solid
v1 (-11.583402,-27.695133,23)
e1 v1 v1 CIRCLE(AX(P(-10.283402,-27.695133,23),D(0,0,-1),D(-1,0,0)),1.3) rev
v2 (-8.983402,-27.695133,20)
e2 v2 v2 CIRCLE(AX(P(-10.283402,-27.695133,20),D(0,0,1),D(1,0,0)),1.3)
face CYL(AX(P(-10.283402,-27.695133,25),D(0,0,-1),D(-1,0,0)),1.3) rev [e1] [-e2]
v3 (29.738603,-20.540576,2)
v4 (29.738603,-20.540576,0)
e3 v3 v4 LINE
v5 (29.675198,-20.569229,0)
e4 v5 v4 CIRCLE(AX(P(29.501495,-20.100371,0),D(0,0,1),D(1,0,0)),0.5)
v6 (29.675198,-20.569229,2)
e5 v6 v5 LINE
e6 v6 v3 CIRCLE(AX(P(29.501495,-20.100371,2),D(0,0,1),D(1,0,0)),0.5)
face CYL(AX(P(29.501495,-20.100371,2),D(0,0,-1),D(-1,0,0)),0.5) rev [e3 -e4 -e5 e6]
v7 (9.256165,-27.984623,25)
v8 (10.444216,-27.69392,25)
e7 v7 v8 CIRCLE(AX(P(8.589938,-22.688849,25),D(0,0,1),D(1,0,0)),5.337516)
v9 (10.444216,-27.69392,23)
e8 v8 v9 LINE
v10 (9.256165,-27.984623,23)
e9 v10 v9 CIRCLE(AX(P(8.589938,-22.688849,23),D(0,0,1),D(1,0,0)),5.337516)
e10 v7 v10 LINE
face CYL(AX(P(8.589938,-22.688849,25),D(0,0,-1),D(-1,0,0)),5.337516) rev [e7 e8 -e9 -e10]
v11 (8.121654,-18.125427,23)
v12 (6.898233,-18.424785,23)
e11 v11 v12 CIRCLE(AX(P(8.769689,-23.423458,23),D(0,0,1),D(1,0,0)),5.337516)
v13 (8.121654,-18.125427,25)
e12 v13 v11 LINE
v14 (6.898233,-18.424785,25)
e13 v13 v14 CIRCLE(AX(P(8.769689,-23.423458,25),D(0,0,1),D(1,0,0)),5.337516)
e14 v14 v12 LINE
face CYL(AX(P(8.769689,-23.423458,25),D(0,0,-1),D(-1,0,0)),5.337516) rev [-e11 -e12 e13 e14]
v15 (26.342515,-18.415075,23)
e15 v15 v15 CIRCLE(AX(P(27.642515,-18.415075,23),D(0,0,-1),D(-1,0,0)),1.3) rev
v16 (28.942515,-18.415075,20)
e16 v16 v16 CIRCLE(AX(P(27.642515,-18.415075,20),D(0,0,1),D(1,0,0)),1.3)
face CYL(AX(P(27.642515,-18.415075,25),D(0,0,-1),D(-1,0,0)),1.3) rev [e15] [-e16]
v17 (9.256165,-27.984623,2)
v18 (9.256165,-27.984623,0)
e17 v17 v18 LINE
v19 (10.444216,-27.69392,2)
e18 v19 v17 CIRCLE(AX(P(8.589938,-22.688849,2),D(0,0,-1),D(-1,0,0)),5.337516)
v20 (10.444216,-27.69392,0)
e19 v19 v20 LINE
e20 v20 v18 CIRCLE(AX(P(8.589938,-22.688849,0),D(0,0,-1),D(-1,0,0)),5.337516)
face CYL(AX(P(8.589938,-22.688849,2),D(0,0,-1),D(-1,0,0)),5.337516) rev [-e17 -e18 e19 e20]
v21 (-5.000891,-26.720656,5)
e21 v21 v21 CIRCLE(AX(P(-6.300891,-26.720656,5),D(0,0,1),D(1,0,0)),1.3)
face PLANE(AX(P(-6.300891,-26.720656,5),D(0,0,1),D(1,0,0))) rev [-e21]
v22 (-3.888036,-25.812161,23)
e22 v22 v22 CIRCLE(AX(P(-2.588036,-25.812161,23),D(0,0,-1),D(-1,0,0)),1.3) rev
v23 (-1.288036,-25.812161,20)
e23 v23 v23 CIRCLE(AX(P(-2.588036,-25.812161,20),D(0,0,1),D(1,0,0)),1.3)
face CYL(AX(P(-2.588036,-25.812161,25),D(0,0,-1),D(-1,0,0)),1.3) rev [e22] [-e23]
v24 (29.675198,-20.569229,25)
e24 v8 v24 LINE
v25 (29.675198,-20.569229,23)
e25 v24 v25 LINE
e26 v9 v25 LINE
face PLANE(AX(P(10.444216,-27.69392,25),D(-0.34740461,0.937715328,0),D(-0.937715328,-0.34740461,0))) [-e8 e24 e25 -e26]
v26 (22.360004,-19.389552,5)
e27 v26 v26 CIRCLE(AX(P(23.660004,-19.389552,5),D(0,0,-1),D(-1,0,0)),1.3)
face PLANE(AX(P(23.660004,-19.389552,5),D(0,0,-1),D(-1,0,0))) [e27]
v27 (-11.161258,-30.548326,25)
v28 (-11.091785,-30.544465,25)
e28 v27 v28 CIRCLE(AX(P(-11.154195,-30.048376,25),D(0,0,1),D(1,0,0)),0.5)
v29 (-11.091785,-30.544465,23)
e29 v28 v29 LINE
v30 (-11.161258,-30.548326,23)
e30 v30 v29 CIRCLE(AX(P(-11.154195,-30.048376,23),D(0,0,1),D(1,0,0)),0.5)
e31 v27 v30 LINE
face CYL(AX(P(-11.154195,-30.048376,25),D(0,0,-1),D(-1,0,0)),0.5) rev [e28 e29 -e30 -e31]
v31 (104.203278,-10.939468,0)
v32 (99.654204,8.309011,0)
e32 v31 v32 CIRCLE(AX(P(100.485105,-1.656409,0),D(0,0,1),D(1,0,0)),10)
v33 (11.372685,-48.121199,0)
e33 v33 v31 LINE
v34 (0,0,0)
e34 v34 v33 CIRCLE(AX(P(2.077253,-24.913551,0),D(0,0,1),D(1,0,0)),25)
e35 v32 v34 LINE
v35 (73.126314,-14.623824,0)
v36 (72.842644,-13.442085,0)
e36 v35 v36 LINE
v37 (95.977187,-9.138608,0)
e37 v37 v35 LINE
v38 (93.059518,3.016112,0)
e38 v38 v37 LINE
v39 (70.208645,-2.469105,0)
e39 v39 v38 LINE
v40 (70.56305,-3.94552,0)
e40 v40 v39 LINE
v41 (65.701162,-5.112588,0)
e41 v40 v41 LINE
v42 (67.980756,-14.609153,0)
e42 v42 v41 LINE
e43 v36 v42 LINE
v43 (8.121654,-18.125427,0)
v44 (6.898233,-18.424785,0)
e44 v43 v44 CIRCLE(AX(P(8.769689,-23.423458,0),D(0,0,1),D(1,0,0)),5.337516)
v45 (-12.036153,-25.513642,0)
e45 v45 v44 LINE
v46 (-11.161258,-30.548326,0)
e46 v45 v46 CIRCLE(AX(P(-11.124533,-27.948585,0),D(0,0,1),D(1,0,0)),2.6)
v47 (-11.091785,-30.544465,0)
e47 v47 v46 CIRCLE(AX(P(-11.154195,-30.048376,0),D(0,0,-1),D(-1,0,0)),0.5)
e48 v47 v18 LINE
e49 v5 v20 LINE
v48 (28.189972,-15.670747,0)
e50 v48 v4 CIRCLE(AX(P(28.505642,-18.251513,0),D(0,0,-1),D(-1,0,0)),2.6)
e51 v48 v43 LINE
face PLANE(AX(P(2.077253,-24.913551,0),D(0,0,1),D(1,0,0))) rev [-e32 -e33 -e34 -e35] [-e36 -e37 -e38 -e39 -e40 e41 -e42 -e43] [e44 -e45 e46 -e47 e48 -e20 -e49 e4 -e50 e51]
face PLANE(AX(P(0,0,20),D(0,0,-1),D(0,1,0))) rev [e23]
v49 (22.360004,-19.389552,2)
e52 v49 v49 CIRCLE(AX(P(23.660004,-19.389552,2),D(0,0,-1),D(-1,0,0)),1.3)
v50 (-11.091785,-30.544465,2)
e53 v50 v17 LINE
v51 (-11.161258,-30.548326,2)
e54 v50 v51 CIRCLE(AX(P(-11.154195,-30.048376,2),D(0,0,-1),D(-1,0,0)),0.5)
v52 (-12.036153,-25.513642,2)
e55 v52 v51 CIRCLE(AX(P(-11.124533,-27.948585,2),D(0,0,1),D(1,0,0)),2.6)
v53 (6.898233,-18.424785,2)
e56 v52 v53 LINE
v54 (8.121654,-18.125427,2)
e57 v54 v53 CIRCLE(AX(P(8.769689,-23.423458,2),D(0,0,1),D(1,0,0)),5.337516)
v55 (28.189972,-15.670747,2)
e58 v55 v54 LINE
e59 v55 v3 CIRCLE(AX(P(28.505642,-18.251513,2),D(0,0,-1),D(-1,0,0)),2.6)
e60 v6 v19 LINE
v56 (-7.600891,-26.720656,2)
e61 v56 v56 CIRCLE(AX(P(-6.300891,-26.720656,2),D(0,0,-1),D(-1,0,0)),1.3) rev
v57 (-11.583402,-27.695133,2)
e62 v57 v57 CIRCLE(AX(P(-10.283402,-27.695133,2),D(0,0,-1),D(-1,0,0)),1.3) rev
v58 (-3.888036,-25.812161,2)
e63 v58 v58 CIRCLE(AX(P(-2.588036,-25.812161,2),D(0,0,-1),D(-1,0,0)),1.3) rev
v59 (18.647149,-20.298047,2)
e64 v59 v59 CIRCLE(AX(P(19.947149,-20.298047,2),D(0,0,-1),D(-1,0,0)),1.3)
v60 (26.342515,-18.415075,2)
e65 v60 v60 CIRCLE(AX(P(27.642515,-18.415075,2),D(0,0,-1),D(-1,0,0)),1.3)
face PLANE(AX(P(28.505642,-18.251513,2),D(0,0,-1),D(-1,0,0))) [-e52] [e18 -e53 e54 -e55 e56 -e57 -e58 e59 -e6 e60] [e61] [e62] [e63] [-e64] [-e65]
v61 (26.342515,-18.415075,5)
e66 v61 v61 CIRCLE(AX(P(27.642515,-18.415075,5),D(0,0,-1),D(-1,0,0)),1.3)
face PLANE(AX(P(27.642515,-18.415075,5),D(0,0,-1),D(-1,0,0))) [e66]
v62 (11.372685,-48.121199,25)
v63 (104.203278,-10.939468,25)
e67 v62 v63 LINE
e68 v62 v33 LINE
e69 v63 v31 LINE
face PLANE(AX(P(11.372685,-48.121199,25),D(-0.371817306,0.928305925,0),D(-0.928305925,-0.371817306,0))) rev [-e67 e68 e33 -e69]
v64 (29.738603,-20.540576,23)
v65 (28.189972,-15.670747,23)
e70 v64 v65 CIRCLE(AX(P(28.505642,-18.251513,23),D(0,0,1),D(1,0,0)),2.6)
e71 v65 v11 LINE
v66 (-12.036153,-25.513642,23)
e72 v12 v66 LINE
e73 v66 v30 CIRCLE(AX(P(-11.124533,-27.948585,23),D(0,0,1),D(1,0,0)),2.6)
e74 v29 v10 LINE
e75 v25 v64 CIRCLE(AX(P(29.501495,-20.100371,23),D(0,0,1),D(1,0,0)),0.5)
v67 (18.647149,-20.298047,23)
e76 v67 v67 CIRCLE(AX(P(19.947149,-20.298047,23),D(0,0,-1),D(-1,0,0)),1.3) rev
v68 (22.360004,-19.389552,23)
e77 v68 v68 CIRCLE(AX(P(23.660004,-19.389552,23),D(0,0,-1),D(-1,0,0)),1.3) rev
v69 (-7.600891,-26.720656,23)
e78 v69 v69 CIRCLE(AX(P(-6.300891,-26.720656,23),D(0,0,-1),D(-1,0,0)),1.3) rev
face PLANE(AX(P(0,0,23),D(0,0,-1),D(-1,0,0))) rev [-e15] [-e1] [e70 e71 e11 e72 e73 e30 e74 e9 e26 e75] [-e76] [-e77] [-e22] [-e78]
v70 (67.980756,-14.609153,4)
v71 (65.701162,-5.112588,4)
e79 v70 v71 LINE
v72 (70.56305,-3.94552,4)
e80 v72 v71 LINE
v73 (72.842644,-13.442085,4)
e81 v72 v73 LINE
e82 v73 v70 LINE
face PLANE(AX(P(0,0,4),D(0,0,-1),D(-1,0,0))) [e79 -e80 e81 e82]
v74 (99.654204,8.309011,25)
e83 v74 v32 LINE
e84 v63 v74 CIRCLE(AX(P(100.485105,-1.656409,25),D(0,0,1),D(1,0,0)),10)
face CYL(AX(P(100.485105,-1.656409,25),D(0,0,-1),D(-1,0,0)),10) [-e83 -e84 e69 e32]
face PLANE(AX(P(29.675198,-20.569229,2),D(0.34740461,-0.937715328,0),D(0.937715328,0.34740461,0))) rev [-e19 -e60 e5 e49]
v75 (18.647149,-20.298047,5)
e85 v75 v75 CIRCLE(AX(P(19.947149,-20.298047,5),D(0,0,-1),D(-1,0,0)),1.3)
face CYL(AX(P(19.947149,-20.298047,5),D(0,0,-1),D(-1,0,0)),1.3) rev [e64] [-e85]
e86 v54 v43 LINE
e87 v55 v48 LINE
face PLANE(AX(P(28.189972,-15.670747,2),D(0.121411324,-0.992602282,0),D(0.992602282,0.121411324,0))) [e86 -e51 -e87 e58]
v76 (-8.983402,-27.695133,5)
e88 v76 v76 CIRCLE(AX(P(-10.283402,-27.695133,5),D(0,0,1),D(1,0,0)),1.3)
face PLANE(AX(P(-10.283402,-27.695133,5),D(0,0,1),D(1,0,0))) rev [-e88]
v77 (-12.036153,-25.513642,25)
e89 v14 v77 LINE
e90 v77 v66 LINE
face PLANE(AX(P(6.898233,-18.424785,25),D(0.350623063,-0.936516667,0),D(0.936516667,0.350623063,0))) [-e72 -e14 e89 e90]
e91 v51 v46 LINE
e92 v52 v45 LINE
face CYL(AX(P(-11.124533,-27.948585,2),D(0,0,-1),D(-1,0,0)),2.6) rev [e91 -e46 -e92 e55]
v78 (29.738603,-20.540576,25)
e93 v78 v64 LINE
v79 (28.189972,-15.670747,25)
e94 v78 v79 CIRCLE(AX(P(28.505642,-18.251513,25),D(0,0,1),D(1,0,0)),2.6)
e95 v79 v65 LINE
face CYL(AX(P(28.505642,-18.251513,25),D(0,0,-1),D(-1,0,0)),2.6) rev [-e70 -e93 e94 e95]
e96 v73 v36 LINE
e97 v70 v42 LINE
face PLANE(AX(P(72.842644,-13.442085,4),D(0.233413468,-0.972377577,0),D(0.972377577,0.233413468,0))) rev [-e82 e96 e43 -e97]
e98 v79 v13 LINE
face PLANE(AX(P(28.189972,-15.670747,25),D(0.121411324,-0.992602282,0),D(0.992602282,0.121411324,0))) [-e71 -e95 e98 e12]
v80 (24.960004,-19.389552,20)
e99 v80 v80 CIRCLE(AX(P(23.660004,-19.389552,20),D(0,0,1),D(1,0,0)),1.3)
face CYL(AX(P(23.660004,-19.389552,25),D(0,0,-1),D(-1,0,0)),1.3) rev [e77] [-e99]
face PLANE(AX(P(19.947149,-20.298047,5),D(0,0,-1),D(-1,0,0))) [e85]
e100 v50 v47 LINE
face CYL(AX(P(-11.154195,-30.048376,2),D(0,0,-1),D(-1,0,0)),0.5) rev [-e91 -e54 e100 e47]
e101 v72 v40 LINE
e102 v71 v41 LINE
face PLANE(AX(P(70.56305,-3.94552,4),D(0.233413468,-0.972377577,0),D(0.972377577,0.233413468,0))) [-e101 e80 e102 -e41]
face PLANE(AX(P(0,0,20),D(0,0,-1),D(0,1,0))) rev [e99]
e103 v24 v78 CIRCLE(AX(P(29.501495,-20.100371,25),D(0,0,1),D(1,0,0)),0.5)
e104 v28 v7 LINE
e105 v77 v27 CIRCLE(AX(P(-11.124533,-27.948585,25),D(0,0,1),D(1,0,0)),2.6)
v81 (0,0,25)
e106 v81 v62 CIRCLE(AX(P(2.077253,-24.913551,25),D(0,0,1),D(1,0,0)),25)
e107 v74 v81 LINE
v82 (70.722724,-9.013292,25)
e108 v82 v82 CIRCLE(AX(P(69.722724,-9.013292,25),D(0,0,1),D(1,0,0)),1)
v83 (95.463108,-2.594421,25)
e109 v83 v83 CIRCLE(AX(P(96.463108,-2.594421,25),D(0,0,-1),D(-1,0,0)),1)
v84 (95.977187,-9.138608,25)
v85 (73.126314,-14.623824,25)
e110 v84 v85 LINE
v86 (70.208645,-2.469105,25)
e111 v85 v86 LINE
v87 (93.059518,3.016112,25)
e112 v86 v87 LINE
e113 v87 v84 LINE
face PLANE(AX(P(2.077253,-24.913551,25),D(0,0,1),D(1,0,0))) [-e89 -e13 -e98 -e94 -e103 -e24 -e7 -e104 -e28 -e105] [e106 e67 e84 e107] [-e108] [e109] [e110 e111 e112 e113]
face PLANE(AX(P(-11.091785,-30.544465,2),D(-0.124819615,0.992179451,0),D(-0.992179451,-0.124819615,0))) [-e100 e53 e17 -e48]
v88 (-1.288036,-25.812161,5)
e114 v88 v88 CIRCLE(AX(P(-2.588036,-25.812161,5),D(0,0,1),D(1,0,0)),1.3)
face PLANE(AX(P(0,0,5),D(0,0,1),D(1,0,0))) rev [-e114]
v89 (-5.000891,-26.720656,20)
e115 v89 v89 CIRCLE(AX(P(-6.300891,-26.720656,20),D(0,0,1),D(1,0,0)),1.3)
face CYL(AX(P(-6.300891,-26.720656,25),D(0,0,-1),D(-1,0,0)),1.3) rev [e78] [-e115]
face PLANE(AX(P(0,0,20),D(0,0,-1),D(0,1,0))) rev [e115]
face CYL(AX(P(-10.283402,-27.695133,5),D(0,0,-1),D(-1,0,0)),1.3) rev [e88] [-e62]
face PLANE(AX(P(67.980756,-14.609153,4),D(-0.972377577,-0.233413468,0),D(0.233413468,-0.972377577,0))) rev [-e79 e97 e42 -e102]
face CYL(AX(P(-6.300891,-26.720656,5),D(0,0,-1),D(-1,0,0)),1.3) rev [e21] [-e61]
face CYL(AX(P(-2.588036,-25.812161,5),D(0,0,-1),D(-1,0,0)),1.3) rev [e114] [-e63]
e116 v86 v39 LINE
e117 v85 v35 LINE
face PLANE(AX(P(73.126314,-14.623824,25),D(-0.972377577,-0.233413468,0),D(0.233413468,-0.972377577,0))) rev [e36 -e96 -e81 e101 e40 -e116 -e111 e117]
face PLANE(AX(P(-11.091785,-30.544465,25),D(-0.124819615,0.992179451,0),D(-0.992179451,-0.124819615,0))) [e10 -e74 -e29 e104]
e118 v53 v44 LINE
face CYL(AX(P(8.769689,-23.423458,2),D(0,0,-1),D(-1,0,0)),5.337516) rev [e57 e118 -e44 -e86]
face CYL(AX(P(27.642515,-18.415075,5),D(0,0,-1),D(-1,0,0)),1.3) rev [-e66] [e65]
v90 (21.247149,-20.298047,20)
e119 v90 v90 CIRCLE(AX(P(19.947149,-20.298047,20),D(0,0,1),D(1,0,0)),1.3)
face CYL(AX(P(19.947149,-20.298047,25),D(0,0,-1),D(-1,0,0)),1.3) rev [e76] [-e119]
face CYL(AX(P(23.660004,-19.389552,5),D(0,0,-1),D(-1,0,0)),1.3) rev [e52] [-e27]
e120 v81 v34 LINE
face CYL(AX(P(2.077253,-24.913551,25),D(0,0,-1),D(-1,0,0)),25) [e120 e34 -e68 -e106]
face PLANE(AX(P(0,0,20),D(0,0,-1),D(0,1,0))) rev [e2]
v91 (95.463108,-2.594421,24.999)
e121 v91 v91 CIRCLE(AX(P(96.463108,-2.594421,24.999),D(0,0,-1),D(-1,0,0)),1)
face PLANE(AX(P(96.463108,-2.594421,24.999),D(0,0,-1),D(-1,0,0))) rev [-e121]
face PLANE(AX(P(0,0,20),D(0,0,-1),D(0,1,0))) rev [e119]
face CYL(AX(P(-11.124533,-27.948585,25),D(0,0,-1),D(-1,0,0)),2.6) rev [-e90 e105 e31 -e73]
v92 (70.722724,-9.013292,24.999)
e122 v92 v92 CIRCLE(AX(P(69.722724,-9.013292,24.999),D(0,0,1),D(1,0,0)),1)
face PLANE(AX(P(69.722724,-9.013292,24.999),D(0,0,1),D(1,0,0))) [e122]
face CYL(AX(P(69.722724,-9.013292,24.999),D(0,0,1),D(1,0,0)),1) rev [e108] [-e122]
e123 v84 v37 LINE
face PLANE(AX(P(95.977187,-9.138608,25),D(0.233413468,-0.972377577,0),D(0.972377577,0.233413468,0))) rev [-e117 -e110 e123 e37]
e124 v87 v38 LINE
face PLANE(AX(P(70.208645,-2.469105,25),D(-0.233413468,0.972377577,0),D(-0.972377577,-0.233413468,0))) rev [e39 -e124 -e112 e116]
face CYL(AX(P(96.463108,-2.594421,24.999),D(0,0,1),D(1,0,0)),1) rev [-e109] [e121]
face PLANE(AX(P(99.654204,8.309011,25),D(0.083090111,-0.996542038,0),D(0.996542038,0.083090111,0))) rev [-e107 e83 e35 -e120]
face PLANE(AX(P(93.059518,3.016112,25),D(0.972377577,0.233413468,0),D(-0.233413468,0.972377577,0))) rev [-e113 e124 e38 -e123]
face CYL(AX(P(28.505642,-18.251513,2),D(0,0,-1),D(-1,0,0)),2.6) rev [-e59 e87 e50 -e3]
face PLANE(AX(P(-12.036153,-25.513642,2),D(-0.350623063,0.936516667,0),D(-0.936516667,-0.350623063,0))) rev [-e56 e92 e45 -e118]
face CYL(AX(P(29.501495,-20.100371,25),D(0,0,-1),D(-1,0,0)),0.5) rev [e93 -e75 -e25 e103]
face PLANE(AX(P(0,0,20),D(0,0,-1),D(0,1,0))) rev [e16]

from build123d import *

# Parameters (mm, degrees)
EXTRUDE_3_DEPTH          = 25
CUT_EXTRUDE_6_DEPTH      = 25
SKETCH_9_R               = 1
CUT_EXTRUDE_11_DEPTH     = 0.001
CUT_EXTRUDE_12_DEPTH     = 4
CUT_EXTRUDE_17_DEPTH     = 2
CUT_EXTRUDE_START        = 2
CUT_EXTRUDE_18_DEPTH     = 2
CUT_EXTRUDE_START_2      = 20
CUT_EXTRUDE_19_OUTLINE_R = 1.3
CUT_EXTRUDE_19_DEPTH     = 3
SKETCH_4_20_R            = 1.3
CUT_EXTRUDE_20_DEPTH     = 5


# Read off the part's stored shape, not the designer's step: 切除-拉伸19
with BuildPart() as part:
    # 草图7 → 凸台-拉伸3 (new body)
    with BuildSketch(Plane.XY):
        with BuildLine():
            Line((99.654203795, 8.309011134), (0, 0))
            ThreePointArc((0, 0), (-22.25252281, -30.663509172), (11.372685429, -48.121199083))
            Line((11.372685429, -48.121199083), (104.203277967, -10.939468499))
            ThreePointArc((104.203277967, -10.939468499), (110.217015146, 0.643574044), (99.654203795, 8.309011134))
        make_face()
    extrude(amount=EXTRUDE_3_DEPTH)

    # 草图3 → 切除-拉伸6 (cut)
    with BuildSketch(Plane.XY):
        Polygon((95.977186606, -9.138607998), (73.126313538, -14.623824499), (70.208645187, -2.469104782), (93.059518254, 3.016111719), align=None)
    extrude(amount=CUT_EXTRUDE_6_DEPTH, mode=Mode.SUBTRACT)

    # 草图9 → 切除-拉伸11 (cut)
    with BuildSketch(Plane.XY.offset(25)):
        with Locations((69.722724208, -9.013291577)):
            Circle(SKETCH_9_R)
        with Locations(Location((96.463107585, -2.594421203, 0), (0, 0, 180))):
            Circle(SKETCH_9_R)
    extrude(amount=-CUT_EXTRUDE_11_DEPTH, mode=Mode.SUBTRACT)

    # 草图3<11> → 切除-拉伸12 (cut)
    with BuildSketch(Plane.XY):
        Polygon((72.842644051, -13.442085282), (67.980756164, -14.609152622), (65.701162058, -5.112587525), (70.563049944, -3.945520185), align=None)
    extrude(amount=CUT_EXTRUDE_12_DEPTH, mode=Mode.SUBTRACT)

    # Sketch 3D_5 → 切除-拉伸17 (cut)
    with BuildSketch(Plane(origin=(10.444215818, -27.693919668, 25), x_dir=(-0.9953297932940416, 0.09653290931718772, 0), z_dir=(0, 0, -1))):
        with BuildLine():
            Line((0, 0), (-18.453401997, 8.947839585))
            ThreePointArc((-18.453401997, 8.947839585), (-18.48417706, 8.964108788), (-18.513745535, 8.982479872))
            ThreePointArc((-18.513745535, 8.982479872), (-19.45567303, 12.165265617), (-16.502248474, 13.680071182))
            Line((-16.502248474, 13.680071182), (3.235389304, 9.299601756))
            ThreePointArc((3.235389304, 9.299601756), (3.842109592, 9.12676054), (4.424199035, 8.883541558))
            Line((4.424199035, 8.883541558), (22.585849479, 0))
            ThreePointArc((22.585849479, 0), (23.950111663, -3.025911631), (21.229027313, -4.926714742))
            ThreePointArc((21.229027313, -4.926714742), (21.194456039, -4.922638166), (21.160252198, -4.916166022))
            Line((21.160252198, -4.916166022), (1.154440034, -0.404031474))
            ThreePointArc((1.154440034, -0.404031474), (0.56560873, -0.235192692), (0, 0))
        make_face()
    extrude(amount=CUT_EXTRUDE_17_DEPTH, mode=Mode.SUBTRACT)

    # 草图4<19> → 切除-拉伸18 (cut)
    with BuildSketch(Plane.XY.offset(CUT_EXTRUDE_START)):
        with BuildLine():
            Line((29.675197601, -20.569228925), (10.444215818, -27.693919668))
            ThreePointArc((10.444215818, -27.693919668), (9.858544762, -27.873414105), (9.256164924, -27.984622777))
            Line((9.256164924, -27.984622777), (-11.091785437, -30.544465472))
            ThreePointArc((-11.091785437, -30.544465472), (-11.126454314, -30.547605594), (-11.161257657, -30.548325866))
            ThreePointArc((-11.161257657, -30.548325866), (-13.686143926, -28.393725709), (-12.036153076, -25.513641909))
            Line((-12.036153076, -25.513641909), (6.898232818, -18.424785281))
            ThreePointArc((6.898232818, -18.424785281), (7.50108242, -18.23889297), (8.121654063, -18.125427433))
            Line((8.121654063, -18.125427433), (28.189972451, -15.670747301))
            ThreePointArc((28.189972451, -15.670747301), (30.983375316, -17.463581076), (29.738603249, -20.540575553))
            ThreePointArc((29.738603249, -20.540575553), (29.707399451, -20.556006509), (29.675197601, -20.569228925))
        make_face()
    extrude(amount=-CUT_EXTRUDE_18_DEPTH, mode=Mode.SUBTRACT)

    # 切除-拉伸19 outline → 切除-拉伸19 (cut)
    with BuildSketch(Plane.XY.offset(CUT_EXTRUDE_START_2)):
        with Locations((27.642515471, -18.415074729)):
            Circle(CUT_EXTRUDE_19_OUTLINE_R)
        with Locations((23.660004397, -19.389551795)):
            Circle(CUT_EXTRUDE_19_OUTLINE_R)
        with Locations((19.947149108, -20.298047028)):
            Circle(CUT_EXTRUDE_19_OUTLINE_R)
        with Locations((-2.588035502, -25.812161156)):
            Circle(CUT_EXTRUDE_19_OUTLINE_R)
        with Locations((-6.300890791, -26.72065639)):
            Circle(CUT_EXTRUDE_19_OUTLINE_R)
        with Locations((-10.283401864, -27.695133455)):
            Circle(CUT_EXTRUDE_19_OUTLINE_R)
    extrude(amount=CUT_EXTRUDE_19_DEPTH, mode=Mode.SUBTRACT)

    # 草图4<20> → 切除-拉伸20 (cut)
    with BuildSketch(Plane.XY):
        with Locations(Location((-2.588035502, -25.812161156, 0), (0, 0, 180))):
            Circle(SKETCH_4_20_R)
        with Locations(Location((27.642515471, -18.415074729, 0), (0, 0, 180))):
            Circle(SKETCH_4_20_R)
        with Locations(Location((23.660004397, -19.389551795, 0), (0, 0, 180))):
            Circle(SKETCH_4_20_R)
        with Locations(Location((19.947149108, -20.298047028, 0), (0, 0, 180))):
            Circle(SKETCH_4_20_R)
        with Locations(Location((-6.300890791, -26.72065639, 0), (0, 0, 180))):
            Circle(SKETCH_4_20_R)
        with Locations(Location((-10.283401864, -27.695133455, 0), (0, 0, 180))):
            Circle(SKETCH_4_20_R)
    extrude(amount=CUT_EXTRUDE_20_DEPTH, mode=Mode.SUBTRACT)


solid = part.part
